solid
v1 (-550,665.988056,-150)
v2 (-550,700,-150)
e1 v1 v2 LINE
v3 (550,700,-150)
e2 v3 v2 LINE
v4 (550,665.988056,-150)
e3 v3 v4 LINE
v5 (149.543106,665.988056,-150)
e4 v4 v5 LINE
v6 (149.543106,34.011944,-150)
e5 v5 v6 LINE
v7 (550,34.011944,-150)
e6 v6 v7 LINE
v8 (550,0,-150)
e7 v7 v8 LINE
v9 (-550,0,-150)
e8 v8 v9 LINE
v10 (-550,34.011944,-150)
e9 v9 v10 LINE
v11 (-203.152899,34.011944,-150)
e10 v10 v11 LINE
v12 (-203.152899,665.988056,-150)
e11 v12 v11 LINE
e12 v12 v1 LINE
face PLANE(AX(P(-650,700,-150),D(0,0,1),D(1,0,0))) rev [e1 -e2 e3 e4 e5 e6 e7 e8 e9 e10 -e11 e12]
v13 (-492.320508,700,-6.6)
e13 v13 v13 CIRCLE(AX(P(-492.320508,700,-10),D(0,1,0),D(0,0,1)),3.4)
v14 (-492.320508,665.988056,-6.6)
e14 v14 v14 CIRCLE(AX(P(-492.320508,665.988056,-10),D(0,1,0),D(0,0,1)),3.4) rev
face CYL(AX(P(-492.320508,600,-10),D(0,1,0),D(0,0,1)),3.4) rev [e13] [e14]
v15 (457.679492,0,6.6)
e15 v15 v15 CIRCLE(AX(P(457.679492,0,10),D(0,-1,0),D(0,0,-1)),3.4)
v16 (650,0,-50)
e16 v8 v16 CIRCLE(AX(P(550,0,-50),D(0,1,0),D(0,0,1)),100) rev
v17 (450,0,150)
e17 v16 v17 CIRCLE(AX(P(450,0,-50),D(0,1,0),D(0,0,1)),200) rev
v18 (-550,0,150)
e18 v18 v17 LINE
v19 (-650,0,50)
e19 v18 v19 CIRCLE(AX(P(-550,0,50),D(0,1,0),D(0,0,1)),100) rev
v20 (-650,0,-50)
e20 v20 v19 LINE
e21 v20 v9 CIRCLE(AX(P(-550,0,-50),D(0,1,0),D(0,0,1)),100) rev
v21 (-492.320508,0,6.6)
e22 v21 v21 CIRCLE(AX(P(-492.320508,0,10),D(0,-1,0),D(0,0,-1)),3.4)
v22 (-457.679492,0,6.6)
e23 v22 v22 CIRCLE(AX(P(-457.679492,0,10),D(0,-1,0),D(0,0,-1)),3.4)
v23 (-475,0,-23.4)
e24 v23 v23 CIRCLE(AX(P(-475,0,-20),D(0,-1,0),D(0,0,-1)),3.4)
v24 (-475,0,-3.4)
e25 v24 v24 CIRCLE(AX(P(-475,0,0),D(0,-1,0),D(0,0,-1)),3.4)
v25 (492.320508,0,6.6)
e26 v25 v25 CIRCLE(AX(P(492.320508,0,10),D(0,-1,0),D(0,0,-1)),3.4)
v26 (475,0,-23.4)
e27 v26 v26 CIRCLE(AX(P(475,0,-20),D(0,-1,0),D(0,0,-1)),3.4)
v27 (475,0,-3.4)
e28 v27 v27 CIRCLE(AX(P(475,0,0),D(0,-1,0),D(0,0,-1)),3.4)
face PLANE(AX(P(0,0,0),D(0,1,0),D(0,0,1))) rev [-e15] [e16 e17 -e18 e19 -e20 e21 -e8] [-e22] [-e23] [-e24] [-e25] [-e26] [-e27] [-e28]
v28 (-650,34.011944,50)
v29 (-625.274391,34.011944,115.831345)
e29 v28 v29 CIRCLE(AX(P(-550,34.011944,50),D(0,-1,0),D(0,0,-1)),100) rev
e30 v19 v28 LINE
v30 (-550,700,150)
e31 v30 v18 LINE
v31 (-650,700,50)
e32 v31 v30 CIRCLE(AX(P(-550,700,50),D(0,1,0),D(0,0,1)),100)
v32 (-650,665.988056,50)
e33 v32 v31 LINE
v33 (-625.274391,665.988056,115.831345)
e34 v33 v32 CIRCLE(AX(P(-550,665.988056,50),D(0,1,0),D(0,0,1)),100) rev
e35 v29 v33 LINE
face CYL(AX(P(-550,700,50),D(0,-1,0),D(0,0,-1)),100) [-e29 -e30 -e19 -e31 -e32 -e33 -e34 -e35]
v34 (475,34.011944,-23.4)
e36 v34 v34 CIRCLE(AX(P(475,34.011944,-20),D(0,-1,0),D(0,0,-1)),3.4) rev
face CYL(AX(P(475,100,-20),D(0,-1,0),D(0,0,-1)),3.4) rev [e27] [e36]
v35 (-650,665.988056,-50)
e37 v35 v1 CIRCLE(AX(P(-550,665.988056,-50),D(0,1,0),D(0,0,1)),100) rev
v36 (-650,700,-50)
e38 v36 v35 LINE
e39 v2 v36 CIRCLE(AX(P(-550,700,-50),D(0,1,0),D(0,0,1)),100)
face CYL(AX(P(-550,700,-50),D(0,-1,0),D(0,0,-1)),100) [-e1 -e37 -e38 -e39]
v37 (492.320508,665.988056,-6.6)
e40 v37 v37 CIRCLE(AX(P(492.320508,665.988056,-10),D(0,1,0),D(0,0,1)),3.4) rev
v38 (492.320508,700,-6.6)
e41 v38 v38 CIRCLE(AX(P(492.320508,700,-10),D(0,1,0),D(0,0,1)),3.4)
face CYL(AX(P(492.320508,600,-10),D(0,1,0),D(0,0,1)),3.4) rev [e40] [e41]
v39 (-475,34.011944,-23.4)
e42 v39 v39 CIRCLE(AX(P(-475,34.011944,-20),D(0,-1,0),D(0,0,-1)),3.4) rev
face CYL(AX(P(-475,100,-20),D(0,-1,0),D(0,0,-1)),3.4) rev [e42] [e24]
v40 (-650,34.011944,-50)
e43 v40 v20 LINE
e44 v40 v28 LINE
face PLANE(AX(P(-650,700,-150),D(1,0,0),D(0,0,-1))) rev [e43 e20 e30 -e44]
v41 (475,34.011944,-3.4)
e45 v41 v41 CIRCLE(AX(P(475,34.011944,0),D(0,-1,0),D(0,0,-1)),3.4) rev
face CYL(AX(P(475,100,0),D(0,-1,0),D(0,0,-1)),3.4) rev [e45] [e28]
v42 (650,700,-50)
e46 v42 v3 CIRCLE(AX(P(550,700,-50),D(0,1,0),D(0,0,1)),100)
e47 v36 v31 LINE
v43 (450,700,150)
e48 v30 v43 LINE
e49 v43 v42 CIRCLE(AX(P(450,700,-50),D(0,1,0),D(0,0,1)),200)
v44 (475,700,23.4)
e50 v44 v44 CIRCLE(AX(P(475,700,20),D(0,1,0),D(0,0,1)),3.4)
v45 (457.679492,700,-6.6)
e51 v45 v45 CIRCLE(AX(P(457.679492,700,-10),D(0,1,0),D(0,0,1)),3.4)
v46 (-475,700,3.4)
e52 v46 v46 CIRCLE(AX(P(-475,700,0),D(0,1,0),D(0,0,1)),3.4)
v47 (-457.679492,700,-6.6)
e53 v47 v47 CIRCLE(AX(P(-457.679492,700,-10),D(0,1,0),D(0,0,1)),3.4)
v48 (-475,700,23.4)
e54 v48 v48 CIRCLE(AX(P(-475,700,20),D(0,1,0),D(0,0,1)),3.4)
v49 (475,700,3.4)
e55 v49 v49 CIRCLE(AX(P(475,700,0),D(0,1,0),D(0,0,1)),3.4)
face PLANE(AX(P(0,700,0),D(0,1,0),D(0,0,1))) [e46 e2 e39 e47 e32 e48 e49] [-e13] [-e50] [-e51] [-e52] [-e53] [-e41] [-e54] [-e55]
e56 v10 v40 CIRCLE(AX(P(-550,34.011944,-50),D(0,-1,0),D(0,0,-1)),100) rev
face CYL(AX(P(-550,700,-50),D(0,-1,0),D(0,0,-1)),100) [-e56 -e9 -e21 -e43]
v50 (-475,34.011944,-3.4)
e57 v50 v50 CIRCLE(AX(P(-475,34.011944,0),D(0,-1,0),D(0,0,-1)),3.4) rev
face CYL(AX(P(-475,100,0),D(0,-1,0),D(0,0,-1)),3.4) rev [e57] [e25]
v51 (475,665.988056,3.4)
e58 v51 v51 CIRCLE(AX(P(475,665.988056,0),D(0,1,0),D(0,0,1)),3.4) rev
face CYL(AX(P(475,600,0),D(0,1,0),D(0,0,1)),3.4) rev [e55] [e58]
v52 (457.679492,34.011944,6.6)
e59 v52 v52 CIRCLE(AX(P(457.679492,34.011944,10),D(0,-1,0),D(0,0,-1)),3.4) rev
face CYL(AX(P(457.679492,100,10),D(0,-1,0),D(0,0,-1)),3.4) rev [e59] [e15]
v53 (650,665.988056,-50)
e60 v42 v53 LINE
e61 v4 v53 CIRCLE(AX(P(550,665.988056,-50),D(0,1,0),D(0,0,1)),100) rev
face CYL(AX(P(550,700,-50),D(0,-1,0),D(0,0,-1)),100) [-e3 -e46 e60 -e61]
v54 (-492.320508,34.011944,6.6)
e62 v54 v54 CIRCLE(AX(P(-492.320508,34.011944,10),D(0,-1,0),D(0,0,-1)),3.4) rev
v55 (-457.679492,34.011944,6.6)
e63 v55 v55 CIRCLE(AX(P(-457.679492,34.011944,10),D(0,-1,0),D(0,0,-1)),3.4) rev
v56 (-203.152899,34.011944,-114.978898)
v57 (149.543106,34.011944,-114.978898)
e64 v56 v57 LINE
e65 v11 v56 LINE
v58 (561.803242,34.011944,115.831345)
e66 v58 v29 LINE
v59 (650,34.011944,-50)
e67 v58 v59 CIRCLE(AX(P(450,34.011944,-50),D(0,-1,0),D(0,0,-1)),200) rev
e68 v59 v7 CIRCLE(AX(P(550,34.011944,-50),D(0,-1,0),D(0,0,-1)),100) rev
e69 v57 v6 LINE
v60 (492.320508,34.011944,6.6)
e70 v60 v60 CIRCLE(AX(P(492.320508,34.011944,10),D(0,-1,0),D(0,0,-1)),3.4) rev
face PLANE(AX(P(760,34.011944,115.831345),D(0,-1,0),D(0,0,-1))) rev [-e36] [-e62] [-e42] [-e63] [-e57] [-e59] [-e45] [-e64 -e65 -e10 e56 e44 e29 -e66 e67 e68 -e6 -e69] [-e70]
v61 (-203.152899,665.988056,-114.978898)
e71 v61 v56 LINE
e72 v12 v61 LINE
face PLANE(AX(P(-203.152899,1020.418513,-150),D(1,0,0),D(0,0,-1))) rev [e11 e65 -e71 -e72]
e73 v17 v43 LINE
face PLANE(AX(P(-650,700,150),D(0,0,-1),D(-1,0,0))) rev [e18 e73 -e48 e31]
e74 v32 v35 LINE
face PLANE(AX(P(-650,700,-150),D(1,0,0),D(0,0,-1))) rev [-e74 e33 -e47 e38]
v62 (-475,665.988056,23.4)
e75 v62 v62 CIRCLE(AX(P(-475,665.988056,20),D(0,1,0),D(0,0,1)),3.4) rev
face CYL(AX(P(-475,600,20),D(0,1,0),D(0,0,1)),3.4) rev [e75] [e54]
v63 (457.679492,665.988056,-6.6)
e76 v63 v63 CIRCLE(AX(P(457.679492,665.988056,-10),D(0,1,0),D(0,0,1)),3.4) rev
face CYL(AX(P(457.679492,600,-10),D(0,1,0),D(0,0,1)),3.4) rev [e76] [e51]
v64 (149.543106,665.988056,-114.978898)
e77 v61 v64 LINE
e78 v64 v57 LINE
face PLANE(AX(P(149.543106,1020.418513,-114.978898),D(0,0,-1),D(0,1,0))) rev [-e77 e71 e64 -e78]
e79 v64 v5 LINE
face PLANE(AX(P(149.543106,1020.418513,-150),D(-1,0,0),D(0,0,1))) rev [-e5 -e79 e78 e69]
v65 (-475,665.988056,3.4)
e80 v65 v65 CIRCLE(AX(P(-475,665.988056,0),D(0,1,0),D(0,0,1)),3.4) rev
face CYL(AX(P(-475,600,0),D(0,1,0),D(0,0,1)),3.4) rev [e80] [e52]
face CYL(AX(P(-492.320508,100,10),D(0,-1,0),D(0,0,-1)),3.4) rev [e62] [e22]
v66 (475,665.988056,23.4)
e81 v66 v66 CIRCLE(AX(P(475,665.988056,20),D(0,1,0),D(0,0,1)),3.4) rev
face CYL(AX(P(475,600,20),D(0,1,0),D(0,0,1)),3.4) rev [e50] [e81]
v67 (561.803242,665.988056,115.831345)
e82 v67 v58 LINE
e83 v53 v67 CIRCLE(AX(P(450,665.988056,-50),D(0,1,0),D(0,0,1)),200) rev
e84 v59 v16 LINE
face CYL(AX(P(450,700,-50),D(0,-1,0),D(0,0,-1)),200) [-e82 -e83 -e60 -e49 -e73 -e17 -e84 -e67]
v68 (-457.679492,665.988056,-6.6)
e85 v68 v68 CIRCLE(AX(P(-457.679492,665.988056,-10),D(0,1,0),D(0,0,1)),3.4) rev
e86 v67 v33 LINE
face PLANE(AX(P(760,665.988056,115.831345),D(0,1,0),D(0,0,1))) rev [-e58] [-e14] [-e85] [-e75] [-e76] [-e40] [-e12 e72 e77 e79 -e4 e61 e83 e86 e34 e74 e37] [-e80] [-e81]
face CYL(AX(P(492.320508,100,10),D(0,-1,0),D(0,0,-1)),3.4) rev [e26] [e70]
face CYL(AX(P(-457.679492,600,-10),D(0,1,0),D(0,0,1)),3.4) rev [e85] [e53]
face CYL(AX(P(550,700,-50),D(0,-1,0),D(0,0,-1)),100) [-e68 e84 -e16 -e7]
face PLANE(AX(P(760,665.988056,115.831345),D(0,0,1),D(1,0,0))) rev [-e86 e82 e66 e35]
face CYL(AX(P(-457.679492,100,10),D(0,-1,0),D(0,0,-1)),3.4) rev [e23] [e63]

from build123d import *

# Parameters (mm, degrees)
SKETCH1_W           = 1300
SKETCH1_H           = 300
BOSS_EXTRUDE1_DEPTH = 700
FILLET1_R           = 200
FILLET2_R           = 100
FILLET3_R           = 100
FILLET4_R           = 100
SKETCH3_R           = 3.4
CUT_EXTRUDE1_DEPTH  = 100
CUT_EXTRUDE2_START  = -100
SKETCH4_R           = 3.4
CUT_EXTRUDE2_DEPTH  = 100
SKETCH5_W           = 631.976111166
SKETCH5_H           = 319.581114146
CUT_EXTRUDE4_DEPTH  = 1410
SKETCH6_W           = 352.69600487
SKETCH6_H           = 35.021102412
BOSS_EXTRUDE2_DEPTH = 631.976111165


with BuildPart() as part:
    # Sketch1 → Boss-Extrude1 (new body)
    with BuildSketch(Plane(origin=(0, 0, 0), x_dir=(-1, 0, 0), z_dir=(0, 1, 0))):
        Rectangle(SKETCH1_W, SKETCH1_H)
    extrude(amount=BOSS_EXTRUDE1_DEPTH)

    # Fillet1
    fillet1_edges = [part.edges().sort_by_distance(p)[0] for p in [
        (650, 350, 150),
    ]]
    fillet(fillet1_edges, radius=FILLET1_R)

    # Fillet2
    fillet2_edges = [part.edges().sort_by_distance(p)[0] for p in [
        (650, 350, -150),
    ]]
    fillet(fillet2_edges, radius=FILLET2_R - 0.0001)  # a hair under: the kernel refuses the full size

    # Fillet3
    fillet3_edges = [part.edges().sort_by_distance(p)[0] for p in [
        (-650, 350, 150),
    ]]
    fillet(fillet3_edges, radius=FILLET3_R)

    # Fillet4
    fillet4_edges = [part.edges().sort_by_distance(p)[0] for p in [
        (-650, 350, -150),
    ]]
    fillet(fillet4_edges, radius=FILLET4_R)

    # Sketch3 → Cut-Extrude1 (cut)
    with BuildSketch(Plane.XZ):
        with Locations(Location((475, 0, 0), (0, 0, 270))):
            Circle(SKETCH3_R)
        with Locations(Location((492.320508076, 10, 0), (0, 0, 270))):
            Circle(SKETCH3_R)
        with Locations(Location((457.679491924, 10, 0), (0, 0, 270))):
            Circle(SKETCH3_R)
        with Locations(Location((475, -20, 0), (0, 0, 270))):
            Circle(SKETCH3_R)
        with Locations(Location((-475, 0, 0), (0, 0, 270))):
            Circle(SKETCH3_R)
        with Locations(Location((-457.679491924, 10, 0), (0, 0, 270))):
            Circle(SKETCH3_R)
        with Locations(Location((-492.320508076, 10, 0), (0, 0, 270))):
            Circle(SKETCH3_R)
        with Locations(Location((-475, -20, 0), (0, 0, 270))):
            Circle(SKETCH3_R)
    extrude(amount=-CUT_EXTRUDE1_DEPTH, mode=Mode.SUBTRACT)

    # Sketch4 → Cut-Extrude2 (cut)
    with BuildSketch(Plane(origin=(0, 700, 0), x_dir=(-1, 0, 0), z_dir=(0, 1, 0)).offset(CUT_EXTRUDE2_START)):
        with Locations(Location((-475, 0, 0), (0, 0, 270))):
            Circle(SKETCH4_R)
        with Locations(Location((-475, 20, 0), (0, 0, 90))):
            Circle(SKETCH4_R)
        with Locations(Location((-492.320508076, -10, 0), (0, 0, 90))):
            Circle(SKETCH4_R)
        with Locations(Location((-457.679491924, -10, 0), (0, 0, 90))):
            Circle(SKETCH4_R)
        with Locations(Location((475, 0, 0), (0, 0, 270))):
            Circle(SKETCH4_R)
        with Locations(Location((475, 20, 0), (0, 0, 90))):
            Circle(SKETCH4_R)
        with Locations(Location((457.679491924, -10, 0), (0, 0, 90))):
            Circle(SKETCH4_R)
        with Locations(Location((492.320508076, -10, 0), (0, 0, 90))):
            Circle(SKETCH4_R)
    extrude(amount=CUT_EXTRUDE2_DEPTH, mode=Mode.SUBTRACT)

    # Sketch5 → Cut-Extrude4 (cut)
    with BuildSketch(Plane(origin=(-650, 0, 0), x_dir=(0, -1, 0), z_dir=(-1, 0, 0))):
        with Locations((-350, -43.959211894)):
            Rectangle(SKETCH5_W, SKETCH5_H)
    extrude(amount=-CUT_EXTRUDE4_DEPTH, mode=Mode.SUBTRACT)

    # Sketch6 → Boss-Extrude2 (add)
    with BuildSketch(Plane(origin=(0, 34.011944417, 0), x_dir=(-1, 0, 0), z_dir=(0, 1, 0))):
        with Locations((26.80489637, -132.489448794)):
            Rectangle(SKETCH6_W, SKETCH6_H)
    extrude(amount=BOSS_EXTRUDE2_DEPTH)


solid = part.part
